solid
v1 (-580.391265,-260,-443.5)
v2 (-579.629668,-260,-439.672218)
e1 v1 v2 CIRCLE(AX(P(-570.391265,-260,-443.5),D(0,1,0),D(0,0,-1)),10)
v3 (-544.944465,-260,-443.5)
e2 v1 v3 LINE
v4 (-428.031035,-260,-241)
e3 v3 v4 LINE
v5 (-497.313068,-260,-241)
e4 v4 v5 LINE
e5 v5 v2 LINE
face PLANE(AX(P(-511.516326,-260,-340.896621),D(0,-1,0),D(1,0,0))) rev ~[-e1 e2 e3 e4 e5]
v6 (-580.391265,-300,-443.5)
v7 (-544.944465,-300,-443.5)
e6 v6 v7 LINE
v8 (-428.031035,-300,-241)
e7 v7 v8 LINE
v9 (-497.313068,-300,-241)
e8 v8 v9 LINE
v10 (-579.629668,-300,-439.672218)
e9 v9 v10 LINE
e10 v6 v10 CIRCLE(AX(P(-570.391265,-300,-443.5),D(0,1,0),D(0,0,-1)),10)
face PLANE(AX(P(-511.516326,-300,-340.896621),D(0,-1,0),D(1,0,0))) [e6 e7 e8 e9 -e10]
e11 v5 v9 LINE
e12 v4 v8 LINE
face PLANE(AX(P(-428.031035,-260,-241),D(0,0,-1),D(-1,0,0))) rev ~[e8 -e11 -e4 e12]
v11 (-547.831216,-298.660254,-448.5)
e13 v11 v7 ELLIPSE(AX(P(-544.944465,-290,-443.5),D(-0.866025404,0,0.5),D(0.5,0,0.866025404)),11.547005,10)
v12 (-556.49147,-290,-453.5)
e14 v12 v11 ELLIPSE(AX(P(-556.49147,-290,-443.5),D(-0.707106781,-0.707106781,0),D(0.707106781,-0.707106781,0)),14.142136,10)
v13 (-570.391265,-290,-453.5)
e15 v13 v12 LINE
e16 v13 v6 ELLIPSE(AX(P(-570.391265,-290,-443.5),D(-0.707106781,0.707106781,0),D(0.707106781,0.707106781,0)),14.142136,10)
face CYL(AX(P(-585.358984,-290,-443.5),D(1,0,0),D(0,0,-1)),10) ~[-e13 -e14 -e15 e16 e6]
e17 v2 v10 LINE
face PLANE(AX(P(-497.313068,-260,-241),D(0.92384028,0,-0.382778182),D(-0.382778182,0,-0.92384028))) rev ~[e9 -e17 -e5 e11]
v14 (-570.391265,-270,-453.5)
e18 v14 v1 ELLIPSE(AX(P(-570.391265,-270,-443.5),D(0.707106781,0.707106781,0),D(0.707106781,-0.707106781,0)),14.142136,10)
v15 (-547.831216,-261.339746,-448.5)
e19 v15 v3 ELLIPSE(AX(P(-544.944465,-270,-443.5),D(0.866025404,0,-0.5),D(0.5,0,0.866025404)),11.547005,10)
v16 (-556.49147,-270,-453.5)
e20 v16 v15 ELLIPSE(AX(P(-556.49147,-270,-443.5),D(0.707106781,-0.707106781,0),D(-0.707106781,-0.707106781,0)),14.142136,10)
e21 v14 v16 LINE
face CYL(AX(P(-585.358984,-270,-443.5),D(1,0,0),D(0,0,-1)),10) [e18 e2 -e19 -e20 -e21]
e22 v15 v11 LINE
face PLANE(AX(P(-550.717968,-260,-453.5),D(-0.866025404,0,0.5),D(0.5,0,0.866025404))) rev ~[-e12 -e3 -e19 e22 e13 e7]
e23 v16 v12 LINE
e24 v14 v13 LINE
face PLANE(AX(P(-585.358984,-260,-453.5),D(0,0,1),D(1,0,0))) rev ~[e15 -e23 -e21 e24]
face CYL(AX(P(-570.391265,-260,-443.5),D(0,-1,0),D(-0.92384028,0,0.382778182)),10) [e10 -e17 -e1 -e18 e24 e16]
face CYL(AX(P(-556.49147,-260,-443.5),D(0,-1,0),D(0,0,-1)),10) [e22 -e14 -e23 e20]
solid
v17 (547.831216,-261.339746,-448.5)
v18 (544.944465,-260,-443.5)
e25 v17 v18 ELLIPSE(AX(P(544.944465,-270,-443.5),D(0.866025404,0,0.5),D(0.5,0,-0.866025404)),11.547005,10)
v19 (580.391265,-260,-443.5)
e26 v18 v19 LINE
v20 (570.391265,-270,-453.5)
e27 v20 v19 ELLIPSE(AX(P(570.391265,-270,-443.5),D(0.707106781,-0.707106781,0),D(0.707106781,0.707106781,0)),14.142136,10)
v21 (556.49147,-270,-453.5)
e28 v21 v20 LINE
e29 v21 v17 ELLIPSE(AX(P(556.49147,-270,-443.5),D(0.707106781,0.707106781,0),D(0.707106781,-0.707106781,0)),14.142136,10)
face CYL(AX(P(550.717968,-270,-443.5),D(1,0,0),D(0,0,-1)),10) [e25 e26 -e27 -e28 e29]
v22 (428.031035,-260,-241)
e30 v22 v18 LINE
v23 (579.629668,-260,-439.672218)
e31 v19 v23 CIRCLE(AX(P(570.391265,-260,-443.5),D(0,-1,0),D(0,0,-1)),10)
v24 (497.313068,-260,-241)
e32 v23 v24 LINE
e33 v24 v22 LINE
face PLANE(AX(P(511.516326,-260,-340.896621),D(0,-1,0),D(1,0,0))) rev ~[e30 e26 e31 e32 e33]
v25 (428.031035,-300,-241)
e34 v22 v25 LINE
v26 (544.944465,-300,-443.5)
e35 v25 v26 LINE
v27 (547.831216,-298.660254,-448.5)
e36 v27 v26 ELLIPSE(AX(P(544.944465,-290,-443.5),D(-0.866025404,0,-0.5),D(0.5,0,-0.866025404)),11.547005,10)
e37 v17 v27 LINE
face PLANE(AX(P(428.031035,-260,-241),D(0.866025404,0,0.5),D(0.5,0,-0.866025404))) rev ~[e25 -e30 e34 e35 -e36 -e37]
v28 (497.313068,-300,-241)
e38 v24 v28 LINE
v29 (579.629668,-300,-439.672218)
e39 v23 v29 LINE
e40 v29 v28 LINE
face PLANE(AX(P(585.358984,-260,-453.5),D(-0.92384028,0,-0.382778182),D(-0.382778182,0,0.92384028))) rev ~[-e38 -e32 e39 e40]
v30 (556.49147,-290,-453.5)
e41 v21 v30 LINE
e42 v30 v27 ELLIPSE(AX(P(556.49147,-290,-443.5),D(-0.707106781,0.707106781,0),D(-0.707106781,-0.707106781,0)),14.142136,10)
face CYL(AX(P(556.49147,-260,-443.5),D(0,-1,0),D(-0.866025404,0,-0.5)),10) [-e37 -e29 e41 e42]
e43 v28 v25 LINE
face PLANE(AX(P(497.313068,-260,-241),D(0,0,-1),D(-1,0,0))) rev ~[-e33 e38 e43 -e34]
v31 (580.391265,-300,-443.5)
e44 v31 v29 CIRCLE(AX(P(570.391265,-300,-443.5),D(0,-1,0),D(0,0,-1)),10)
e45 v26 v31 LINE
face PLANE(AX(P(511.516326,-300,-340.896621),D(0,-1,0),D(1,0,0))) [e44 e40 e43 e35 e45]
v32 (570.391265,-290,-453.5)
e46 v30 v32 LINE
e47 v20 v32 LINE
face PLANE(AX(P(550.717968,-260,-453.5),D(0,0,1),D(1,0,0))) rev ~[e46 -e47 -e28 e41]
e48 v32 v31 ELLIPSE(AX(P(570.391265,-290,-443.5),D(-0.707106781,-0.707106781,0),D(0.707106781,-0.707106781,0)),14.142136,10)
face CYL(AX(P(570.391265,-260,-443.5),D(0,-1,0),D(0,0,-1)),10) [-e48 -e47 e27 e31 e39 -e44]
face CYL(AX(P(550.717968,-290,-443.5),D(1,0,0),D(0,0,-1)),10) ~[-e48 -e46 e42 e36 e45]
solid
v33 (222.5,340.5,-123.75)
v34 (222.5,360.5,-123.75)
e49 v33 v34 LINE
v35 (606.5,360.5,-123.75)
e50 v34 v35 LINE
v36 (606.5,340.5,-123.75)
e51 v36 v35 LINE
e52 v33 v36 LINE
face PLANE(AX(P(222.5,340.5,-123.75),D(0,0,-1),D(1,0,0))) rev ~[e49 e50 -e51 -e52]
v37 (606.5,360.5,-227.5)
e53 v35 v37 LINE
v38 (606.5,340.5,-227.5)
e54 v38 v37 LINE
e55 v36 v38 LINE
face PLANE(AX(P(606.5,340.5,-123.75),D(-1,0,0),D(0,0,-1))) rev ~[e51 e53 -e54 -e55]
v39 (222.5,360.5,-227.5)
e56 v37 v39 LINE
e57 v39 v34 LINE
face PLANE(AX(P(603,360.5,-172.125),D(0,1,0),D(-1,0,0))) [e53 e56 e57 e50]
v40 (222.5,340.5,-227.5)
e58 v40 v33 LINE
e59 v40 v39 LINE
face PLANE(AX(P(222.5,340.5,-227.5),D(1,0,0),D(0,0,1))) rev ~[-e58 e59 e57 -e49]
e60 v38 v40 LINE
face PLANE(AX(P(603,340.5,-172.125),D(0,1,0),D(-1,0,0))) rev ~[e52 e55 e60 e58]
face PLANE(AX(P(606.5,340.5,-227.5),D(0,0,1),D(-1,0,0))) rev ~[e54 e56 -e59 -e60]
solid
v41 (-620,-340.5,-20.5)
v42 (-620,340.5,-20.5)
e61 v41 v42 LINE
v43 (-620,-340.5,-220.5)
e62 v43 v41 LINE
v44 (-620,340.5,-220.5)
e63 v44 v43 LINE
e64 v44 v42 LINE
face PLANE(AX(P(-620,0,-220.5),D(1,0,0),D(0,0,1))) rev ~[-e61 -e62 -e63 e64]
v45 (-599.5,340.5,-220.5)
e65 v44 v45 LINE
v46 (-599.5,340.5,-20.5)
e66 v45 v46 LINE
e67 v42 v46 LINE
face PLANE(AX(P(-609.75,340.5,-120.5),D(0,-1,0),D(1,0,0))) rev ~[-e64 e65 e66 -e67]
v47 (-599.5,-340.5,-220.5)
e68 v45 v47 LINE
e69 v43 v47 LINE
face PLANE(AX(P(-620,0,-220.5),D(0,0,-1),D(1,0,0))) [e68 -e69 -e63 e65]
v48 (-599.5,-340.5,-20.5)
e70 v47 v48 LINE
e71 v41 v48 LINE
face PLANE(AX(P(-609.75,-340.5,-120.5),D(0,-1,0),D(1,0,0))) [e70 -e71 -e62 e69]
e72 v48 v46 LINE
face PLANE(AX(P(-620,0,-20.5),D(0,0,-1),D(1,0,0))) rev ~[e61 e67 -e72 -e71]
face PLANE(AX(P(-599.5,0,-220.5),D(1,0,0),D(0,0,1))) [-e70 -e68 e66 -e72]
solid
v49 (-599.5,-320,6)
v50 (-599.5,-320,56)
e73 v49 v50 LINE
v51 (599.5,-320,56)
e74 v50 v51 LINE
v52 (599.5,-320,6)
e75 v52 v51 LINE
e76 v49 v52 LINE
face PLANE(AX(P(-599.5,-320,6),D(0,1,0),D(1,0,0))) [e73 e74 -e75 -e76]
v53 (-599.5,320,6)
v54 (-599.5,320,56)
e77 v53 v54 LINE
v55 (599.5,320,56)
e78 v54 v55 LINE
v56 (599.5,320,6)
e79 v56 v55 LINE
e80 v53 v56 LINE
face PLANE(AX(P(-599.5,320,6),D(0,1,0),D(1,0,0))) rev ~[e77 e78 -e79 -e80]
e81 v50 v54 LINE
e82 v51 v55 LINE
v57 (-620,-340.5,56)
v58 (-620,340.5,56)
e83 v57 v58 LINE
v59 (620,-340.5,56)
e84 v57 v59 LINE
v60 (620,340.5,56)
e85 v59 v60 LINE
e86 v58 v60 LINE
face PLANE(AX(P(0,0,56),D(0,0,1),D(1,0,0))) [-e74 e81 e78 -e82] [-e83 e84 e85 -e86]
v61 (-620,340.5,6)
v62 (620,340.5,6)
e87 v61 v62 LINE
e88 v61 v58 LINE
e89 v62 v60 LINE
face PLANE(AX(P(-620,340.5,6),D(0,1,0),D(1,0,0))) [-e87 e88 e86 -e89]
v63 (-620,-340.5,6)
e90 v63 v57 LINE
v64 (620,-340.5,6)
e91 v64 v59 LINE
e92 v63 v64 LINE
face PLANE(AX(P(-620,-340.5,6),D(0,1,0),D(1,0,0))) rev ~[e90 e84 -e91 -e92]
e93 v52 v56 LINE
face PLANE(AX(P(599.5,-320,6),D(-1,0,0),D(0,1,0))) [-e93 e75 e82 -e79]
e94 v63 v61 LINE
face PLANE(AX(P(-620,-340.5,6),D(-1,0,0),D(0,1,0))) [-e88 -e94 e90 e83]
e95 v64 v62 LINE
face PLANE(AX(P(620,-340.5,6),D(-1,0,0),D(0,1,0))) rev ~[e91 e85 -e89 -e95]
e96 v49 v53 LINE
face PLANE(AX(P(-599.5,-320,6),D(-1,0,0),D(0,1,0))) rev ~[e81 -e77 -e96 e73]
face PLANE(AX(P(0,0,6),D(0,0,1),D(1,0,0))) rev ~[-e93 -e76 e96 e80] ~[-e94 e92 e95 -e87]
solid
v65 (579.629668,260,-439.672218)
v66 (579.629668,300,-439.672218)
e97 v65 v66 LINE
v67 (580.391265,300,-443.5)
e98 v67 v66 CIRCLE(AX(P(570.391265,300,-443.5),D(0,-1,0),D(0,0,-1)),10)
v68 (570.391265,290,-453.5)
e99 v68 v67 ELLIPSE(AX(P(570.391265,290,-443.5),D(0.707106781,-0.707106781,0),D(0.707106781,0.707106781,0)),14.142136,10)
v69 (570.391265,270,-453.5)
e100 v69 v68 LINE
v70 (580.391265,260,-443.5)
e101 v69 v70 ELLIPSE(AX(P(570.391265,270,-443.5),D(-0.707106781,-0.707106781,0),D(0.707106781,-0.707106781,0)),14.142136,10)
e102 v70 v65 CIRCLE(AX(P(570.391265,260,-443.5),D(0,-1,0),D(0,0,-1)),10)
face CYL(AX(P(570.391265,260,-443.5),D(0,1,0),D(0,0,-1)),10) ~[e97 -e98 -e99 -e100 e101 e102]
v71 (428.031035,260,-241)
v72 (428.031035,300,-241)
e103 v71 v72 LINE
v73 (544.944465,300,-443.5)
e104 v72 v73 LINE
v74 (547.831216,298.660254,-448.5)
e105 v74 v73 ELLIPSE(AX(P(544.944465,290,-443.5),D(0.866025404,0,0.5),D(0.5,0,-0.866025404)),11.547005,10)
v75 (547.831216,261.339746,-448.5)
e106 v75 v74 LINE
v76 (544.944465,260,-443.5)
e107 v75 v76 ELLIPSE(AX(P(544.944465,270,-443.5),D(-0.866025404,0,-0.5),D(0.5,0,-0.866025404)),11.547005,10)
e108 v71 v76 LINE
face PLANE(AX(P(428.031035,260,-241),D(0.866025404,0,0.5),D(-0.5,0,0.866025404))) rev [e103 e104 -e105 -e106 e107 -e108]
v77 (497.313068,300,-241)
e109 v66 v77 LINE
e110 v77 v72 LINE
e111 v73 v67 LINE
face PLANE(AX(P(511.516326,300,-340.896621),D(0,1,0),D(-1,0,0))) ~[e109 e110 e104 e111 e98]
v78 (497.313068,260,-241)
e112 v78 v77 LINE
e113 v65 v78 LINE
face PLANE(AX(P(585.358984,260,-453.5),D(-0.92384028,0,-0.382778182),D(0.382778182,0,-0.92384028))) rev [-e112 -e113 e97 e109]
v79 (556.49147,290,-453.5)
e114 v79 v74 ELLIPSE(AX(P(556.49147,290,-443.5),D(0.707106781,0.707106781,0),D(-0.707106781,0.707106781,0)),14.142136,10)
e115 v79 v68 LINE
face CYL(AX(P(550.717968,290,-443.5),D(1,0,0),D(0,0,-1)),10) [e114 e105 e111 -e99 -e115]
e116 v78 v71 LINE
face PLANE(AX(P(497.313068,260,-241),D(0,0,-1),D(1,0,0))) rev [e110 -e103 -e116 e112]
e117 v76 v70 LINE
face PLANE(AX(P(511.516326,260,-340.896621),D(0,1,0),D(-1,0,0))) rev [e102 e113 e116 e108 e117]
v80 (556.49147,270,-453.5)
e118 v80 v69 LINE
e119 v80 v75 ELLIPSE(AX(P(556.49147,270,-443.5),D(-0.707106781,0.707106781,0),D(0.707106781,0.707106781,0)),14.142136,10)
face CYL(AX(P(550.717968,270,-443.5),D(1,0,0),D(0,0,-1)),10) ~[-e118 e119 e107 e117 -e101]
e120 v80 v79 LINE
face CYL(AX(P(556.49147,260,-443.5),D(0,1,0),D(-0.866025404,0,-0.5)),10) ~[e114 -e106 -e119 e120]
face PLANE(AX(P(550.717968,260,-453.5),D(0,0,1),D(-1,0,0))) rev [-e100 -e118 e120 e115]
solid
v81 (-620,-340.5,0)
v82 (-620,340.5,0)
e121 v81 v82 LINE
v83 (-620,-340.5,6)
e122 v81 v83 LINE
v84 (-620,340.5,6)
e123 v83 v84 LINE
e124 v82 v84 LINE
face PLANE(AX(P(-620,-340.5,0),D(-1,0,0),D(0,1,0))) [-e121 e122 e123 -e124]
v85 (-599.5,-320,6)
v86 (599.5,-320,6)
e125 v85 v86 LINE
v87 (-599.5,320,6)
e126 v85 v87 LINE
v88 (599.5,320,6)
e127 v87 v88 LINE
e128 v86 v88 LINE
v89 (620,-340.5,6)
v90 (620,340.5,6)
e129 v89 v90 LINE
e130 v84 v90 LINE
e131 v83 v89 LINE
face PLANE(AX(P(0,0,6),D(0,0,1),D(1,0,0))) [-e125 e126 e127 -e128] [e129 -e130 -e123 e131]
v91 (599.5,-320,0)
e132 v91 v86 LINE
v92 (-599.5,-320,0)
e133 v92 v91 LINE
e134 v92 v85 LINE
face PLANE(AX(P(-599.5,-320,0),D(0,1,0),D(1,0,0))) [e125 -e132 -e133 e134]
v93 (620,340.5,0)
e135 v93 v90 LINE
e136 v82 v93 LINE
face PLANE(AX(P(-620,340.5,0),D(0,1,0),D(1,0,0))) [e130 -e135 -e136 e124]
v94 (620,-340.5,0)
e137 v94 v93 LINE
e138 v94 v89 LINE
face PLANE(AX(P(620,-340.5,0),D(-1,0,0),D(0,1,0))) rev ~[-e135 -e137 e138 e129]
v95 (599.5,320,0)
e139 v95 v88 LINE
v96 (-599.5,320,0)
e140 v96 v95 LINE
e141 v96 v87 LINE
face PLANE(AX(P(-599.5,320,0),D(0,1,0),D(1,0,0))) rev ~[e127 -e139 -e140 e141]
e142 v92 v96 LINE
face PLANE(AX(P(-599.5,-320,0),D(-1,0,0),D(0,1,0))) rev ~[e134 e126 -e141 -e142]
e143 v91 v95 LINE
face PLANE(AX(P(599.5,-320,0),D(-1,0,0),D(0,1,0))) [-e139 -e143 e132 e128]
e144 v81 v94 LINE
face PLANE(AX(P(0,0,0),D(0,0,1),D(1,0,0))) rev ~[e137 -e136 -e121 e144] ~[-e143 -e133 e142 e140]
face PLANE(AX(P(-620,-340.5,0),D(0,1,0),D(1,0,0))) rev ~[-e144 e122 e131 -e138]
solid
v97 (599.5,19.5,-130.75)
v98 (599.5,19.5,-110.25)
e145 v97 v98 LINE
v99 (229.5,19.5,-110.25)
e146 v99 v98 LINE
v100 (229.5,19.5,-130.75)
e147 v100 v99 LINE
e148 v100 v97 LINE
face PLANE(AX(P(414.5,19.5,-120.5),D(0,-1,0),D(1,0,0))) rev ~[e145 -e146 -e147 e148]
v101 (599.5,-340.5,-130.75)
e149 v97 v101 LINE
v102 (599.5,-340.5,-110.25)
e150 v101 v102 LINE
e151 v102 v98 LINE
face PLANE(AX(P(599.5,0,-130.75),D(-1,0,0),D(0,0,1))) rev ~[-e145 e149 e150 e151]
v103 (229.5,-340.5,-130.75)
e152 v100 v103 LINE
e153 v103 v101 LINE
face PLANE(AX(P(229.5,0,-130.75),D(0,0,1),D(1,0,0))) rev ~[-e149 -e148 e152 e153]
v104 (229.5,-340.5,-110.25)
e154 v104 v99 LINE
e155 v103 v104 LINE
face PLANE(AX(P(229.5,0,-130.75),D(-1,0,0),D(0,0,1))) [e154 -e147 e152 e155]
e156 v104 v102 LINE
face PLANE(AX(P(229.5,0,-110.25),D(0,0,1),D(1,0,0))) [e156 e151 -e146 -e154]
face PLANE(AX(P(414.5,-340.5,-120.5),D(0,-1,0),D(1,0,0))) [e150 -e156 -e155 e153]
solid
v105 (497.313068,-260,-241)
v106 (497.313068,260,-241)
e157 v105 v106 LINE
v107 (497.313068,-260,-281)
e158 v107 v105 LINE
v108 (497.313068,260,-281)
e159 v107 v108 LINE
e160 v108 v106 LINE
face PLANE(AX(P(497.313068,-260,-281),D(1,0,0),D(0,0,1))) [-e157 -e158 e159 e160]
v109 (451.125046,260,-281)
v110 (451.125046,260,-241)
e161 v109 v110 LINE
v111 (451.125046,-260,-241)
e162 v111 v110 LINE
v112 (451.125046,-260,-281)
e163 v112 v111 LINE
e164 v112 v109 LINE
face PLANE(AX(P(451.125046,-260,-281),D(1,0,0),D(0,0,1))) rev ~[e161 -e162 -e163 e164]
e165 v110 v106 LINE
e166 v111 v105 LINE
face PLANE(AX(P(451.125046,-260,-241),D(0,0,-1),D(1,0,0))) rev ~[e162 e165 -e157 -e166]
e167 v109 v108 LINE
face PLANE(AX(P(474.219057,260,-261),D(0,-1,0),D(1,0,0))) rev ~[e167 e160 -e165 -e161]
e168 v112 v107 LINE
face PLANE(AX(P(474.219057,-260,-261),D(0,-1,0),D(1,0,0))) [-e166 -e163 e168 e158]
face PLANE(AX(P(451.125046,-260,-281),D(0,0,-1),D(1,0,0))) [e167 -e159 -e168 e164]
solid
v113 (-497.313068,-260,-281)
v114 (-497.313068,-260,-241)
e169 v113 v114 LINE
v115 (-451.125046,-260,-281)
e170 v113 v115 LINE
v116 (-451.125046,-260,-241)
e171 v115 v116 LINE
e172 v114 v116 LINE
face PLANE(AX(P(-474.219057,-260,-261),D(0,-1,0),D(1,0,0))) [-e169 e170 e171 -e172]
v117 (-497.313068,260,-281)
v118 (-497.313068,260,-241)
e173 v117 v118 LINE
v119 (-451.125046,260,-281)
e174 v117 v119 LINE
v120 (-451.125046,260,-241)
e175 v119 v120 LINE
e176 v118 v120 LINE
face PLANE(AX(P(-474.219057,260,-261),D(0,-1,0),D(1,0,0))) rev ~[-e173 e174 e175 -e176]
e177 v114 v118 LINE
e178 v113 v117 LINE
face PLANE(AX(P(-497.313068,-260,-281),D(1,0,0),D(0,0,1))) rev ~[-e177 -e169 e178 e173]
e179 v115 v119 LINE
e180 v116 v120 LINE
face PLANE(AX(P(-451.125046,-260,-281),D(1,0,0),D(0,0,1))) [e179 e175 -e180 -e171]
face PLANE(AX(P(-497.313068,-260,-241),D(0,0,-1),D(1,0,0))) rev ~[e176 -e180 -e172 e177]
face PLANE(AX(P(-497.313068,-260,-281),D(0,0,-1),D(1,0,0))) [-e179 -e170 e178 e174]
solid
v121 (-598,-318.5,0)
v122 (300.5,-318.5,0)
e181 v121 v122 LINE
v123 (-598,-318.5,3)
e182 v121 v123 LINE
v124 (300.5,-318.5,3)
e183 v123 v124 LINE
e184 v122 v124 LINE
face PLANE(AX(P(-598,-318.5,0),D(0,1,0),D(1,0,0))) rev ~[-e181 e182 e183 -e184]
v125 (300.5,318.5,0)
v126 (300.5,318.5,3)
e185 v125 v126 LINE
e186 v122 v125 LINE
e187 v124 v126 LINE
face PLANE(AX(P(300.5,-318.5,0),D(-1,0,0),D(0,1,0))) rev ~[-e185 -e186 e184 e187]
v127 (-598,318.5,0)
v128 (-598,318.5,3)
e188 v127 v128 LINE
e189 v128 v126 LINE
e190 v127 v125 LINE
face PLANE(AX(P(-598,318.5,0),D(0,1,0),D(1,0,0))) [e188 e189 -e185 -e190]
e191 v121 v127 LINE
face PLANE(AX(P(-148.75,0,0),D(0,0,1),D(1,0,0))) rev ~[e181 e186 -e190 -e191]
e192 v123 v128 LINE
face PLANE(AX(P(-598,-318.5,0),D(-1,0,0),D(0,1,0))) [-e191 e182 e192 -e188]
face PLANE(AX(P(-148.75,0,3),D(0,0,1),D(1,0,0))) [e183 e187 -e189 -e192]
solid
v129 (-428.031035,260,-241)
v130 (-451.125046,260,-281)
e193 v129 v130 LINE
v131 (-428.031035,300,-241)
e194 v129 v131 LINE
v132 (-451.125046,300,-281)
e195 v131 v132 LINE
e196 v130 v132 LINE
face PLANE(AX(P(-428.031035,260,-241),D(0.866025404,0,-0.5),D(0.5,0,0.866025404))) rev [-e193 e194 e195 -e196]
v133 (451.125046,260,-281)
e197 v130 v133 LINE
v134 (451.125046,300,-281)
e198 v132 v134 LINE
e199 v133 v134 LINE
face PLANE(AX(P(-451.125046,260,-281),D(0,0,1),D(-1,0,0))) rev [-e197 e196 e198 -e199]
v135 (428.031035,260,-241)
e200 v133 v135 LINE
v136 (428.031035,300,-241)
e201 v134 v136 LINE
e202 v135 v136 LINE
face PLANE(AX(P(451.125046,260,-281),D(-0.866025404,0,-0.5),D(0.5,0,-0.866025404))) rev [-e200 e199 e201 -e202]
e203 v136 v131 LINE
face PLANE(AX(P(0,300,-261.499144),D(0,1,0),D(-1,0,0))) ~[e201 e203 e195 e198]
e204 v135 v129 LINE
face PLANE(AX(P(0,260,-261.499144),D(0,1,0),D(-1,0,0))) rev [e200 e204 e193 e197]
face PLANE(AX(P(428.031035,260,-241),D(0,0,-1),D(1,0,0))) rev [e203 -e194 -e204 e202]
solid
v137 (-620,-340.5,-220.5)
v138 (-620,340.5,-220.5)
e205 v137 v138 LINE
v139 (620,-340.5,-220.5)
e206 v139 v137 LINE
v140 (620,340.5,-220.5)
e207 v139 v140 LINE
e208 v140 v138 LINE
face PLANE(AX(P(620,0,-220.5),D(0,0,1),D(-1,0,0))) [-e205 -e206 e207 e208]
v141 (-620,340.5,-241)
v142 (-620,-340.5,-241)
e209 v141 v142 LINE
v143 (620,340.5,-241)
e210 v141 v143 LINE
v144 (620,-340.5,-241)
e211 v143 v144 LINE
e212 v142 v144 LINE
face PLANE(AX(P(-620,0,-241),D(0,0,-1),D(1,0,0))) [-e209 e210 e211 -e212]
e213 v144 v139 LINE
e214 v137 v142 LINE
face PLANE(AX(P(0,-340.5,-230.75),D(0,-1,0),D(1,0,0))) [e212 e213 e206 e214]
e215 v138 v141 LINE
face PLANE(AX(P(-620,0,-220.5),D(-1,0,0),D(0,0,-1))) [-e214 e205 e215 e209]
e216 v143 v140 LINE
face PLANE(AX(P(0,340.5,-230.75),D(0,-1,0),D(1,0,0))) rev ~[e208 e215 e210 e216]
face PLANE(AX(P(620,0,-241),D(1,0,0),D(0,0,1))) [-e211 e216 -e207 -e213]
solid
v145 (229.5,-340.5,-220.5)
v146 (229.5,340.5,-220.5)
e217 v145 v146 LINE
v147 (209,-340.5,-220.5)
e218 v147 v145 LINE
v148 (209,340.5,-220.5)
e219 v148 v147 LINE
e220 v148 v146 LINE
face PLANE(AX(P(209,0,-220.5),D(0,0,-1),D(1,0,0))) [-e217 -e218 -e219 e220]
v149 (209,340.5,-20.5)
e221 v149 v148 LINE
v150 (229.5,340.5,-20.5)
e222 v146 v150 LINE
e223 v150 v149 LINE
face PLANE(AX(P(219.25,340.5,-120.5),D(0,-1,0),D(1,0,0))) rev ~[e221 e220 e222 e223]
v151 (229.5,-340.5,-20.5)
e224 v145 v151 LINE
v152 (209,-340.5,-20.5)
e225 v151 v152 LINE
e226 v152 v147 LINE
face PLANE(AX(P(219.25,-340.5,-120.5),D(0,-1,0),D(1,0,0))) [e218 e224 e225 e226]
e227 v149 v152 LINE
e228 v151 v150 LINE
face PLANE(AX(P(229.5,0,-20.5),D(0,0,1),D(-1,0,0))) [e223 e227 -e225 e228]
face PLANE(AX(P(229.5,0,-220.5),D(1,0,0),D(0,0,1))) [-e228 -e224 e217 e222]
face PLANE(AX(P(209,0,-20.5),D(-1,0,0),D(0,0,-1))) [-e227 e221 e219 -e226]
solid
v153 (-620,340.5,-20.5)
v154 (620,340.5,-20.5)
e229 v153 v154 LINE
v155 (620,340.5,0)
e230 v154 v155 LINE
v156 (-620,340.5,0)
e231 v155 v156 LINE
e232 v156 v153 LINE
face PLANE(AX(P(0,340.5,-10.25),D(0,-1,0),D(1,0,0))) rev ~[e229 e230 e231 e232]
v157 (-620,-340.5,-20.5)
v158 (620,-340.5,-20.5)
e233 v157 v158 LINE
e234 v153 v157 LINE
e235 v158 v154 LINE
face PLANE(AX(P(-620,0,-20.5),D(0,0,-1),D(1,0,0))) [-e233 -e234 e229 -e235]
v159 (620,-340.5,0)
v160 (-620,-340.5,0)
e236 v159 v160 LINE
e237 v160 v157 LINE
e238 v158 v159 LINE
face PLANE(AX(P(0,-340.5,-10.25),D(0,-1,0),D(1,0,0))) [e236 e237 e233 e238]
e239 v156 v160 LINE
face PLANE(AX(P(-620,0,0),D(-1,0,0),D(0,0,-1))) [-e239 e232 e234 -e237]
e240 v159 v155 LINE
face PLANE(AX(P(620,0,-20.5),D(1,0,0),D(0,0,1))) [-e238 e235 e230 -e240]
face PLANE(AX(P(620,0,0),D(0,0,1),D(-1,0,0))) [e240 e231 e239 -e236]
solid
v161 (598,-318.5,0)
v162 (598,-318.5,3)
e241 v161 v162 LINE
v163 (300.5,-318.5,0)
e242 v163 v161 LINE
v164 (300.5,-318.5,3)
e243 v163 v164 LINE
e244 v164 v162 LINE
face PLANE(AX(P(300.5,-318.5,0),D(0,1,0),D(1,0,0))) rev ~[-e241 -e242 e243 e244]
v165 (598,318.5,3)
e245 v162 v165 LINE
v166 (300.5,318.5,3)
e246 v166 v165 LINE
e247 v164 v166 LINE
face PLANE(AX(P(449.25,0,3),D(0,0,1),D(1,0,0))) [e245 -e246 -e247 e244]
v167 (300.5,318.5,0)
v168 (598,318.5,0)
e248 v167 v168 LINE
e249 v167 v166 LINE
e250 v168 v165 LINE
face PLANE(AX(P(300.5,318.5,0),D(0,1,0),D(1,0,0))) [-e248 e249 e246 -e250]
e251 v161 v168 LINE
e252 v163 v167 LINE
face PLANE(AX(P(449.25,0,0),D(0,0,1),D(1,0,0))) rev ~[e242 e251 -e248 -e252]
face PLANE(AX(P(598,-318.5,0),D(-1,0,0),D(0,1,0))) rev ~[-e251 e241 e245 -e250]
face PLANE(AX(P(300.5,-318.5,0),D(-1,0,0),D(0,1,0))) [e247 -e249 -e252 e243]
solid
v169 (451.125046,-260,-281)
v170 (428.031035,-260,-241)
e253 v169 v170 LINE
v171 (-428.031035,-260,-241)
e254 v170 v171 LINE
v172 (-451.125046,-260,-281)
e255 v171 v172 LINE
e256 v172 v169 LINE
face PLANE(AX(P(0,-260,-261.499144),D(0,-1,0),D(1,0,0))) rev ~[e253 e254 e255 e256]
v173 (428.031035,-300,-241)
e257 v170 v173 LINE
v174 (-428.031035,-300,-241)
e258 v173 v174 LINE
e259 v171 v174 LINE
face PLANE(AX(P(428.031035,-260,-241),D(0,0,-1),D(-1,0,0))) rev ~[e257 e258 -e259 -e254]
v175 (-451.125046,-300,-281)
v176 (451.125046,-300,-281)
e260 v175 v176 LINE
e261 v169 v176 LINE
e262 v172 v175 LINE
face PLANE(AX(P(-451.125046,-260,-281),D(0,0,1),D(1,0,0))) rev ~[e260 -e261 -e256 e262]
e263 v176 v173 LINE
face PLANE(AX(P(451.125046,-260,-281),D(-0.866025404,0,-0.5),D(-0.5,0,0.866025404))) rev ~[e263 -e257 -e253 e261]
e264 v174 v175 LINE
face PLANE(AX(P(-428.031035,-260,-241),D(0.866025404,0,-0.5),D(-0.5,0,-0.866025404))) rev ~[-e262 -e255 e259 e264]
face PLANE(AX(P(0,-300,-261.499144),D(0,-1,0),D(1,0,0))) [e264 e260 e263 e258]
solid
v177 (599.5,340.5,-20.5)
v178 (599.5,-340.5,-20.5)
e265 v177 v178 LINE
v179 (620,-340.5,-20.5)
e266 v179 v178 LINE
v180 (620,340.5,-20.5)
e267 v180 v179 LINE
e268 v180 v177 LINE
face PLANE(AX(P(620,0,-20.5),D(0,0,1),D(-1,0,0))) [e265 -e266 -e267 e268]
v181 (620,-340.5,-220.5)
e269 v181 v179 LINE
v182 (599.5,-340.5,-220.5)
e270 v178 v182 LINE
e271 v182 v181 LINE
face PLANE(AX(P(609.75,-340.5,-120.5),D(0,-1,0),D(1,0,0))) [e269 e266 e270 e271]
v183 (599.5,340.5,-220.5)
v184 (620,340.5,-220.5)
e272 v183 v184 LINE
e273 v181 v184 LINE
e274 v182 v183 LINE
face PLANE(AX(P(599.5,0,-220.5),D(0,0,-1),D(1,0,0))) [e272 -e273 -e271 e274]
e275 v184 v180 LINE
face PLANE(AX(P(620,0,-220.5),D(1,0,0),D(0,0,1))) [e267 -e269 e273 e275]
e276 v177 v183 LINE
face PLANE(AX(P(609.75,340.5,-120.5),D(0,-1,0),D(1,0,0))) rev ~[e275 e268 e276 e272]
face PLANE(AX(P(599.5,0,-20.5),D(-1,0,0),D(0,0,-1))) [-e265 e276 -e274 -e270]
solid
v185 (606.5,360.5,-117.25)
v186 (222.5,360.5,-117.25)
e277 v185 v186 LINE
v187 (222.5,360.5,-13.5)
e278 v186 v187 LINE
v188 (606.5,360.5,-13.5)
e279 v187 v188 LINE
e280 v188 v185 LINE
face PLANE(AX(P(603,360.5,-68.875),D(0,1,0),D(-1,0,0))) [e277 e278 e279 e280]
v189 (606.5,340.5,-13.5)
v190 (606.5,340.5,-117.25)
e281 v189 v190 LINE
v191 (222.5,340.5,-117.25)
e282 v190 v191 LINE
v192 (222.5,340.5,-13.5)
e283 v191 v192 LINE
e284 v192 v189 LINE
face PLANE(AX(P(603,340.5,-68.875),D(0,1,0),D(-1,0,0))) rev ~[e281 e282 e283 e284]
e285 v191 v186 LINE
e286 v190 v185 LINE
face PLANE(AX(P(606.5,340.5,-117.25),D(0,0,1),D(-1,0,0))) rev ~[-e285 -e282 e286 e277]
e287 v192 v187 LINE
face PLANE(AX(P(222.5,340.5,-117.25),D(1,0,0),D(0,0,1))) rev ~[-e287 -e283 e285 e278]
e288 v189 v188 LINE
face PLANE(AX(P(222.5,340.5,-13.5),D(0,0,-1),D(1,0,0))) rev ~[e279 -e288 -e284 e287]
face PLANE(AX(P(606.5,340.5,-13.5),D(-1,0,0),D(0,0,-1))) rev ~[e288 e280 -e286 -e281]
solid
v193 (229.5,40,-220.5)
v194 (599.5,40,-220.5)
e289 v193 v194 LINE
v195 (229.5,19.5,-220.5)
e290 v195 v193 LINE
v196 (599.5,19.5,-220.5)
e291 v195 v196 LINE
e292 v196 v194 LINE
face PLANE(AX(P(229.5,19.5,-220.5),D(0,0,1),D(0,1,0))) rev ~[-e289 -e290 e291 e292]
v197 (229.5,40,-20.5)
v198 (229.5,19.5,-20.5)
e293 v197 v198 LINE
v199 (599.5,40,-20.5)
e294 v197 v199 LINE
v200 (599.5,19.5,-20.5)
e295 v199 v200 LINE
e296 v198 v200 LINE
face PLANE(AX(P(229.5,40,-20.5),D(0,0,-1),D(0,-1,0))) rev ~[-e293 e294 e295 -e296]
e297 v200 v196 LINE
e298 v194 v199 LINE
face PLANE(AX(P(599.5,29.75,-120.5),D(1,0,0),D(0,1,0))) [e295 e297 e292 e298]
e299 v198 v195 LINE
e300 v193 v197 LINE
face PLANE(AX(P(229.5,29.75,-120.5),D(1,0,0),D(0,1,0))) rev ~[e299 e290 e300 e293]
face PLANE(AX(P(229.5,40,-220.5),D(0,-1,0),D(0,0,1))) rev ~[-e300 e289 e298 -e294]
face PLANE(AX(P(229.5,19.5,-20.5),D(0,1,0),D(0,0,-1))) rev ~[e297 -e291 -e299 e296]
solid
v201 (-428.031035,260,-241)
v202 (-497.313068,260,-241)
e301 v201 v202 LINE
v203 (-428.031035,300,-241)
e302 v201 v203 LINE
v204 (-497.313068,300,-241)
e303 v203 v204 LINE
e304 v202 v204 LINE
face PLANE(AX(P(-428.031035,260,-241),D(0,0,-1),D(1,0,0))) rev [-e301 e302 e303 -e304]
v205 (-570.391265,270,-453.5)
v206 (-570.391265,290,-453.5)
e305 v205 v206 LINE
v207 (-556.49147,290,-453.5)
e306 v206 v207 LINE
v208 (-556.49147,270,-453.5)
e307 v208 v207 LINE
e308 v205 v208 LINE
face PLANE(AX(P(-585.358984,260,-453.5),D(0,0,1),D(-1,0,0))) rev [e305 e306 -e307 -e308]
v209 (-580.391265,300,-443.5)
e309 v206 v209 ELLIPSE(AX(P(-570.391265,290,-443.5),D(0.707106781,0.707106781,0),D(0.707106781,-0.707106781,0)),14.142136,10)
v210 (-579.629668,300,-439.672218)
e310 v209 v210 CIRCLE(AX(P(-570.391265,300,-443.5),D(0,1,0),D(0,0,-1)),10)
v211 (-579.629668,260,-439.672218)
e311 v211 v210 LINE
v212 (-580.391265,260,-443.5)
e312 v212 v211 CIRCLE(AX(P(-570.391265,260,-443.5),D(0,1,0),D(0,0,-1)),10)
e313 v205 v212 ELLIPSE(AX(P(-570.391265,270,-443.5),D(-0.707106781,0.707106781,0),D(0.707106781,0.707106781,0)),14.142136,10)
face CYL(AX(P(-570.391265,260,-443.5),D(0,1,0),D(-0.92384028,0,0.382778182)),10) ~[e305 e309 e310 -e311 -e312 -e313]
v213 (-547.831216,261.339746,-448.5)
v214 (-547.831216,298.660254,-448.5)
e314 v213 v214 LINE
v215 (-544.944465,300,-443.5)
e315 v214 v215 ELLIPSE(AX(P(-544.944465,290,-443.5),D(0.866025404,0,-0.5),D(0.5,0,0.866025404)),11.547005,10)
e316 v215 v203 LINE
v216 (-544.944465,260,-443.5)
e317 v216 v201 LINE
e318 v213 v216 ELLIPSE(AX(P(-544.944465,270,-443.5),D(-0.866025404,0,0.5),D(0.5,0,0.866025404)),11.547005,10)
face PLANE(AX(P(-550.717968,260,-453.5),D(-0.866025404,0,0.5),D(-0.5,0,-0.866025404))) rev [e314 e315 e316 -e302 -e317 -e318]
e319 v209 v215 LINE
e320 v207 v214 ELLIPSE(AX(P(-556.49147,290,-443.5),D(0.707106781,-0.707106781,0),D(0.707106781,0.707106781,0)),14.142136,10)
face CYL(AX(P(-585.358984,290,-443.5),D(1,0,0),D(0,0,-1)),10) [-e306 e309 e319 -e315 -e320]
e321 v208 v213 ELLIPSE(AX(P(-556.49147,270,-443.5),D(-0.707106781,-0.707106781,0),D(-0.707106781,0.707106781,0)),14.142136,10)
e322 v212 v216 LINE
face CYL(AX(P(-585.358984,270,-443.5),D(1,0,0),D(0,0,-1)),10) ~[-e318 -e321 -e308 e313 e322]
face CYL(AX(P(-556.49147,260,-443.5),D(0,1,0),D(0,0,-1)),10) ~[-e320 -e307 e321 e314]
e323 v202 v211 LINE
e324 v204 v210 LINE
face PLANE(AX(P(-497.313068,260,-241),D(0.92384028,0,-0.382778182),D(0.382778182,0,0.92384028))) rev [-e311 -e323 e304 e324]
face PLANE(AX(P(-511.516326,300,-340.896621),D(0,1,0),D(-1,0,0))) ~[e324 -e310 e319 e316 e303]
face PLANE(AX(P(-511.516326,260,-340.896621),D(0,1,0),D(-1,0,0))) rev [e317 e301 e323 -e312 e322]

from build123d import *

# Parameters (mm, degrees)
F1_DEPTH       = 340.5
F1_DEPTH_BACK  = 340.5
F2_DEPTH       = 340.5
F2_DEPTH_BACK  = 340.5
F0_W           = 20.5
F0_H           = 200
F3_DEPTH       = 340.5
F3_DEPTH_BACK  = 340.5
F6_DEPTH       = 40
F7_R           = 10
F7_2_R         = 10
F8_DEPTH       = 40
F10_W          = 46.1880215352
F10_H          = 40
F11_DEPTH      = 520
F12_W          = 7
F12_H          = 96.75
F13_DEPTH      = 20
F14_W          = 1240
F14_H          = 681
F14_W_2        = 1230
F14_H_2        = 671
F14_W_3        = 1199
F14_H_3        = 640
F15_DEPTH      = 6
F16_W          = 898.5
F16_H          = 637
F17_DEPTH      = 3
F16_W_2        = 297.5
F18_DEPTH      = 3
F19_DEPTH      = 50
F22_DEPTH      = 370
F0_W_2         = 370
F0_H_2         = 20.5
F23_DEPTH      = 19.5
F23_DEPTH_BACK = 340.5


# Not quite as in the source:
# - a feature names something its author has since deleted; it is built from what else it names


with BuildPart() as f1:
    # F0 (on Front) → F1 (new body, two sides)
    with BuildSketch(Plane.XZ) as f1_sk:
        Polygon((-599.5, -220.5), (-620, -220.5), (-620, -241), (620, -241), (620, -220.5), (599.5, -220.5), (229.5, -220.5), (209, -220.5), align=None)
    extrude(amount=F1_DEPTH)
    extrude(f1_sk.sketch, amount=-F1_DEPTH_BACK)


with BuildPart() as f2:
    # F0 (on Front) → F2 (new body, two sides)
    with BuildSketch(Plane.XZ) as f2_sk:
        Polygon((229.5, -20.5), (209, -20.5), (209, -220.5), (229.5, -220.5), (229.5, -130.75), (229.5, -110.25), align=None)
    extrude(amount=F2_DEPTH)
    extrude(f2_sk.sketch, amount=-F2_DEPTH_BACK)


with BuildPart() as f2b:
    # F0 (on Front) → F2, piece 2 (new body, two sides)
    with BuildSketch(Plane.XZ) as f2_2_sk:
        with Locations((-609.75, -120.5)):
            Rectangle(F0_W, F0_H)
    extrude(amount=F2_DEPTH)
    extrude(f2_2_sk.sketch, amount=-F2_DEPTH_BACK)


with BuildPart() as f2c:
    # F0 (on Front) → F2, piece 3 (new body, two sides)
    with BuildSketch(Plane.XZ) as f2_3_sk:
        Polygon((620, -220.5), (620, -20.5), (599.5, -20.5), (599.5, -110.25), (599.5, -130.75), (599.5, -220.5), align=None)
    extrude(amount=F2_DEPTH)
    extrude(f2_3_sk.sketch, amount=-F2_DEPTH_BACK)


with BuildPart() as f3:
    # F0 (on Front) → F3 (new body, two sides)
    with BuildSketch(Plane.XZ) as f3_sk:
        Polygon((620, 0), (-620, 0), (-620, -20.5), (-599.5, -20.5), (209, -20.5), (229.5, -20.5), (599.5, -20.5), (620, -20.5), align=None)
    extrude(amount=F3_DEPTH)
    extrude(f3_sk.sketch, amount=-F3_DEPTH_BACK)


with BuildPart() as f6:
    # F5 (on offset) → F6 (new body)
    with BuildSketch(Plane.XZ.offset(260)):
        Polygon((-428.0310354944, -241), (-497.3130677972, -241), (-585.3589838486, -453.5), (-550.7179676972, -453.5), (-451.125046262, -281), align=None)
    extrude(amount=F6_DEPTH)

    # F7
    f7_edges = [f6.edges().sort_by_distance(p)[0] for p in [
        (-568.038476, -300, -453.5),
        (-550.717968, -280, -453.5),
        (-568.038476, -260, -453.5),
        (-585.358984, -280, -453.5),
    ]]
    fillet(f7_edges, radius=F7_R)


with BuildPart() as f6b:
    # F5 (on offset) → F6, piece 2 (new body)
    with BuildSketch(Plane.XZ.offset(260)):
        Polygon((497.3130677972, -241), (428.0310354944, -241), (451.125046262, -281), (550.7179676972, -453.5), (585.3589838486, -453.5), align=None)
    extrude(amount=F6_DEPTH)

    # F7#2
    f7_2_edges = [f6b.edges().sort_by_distance(p)[0] for p in [
        (568.038476, -300, -453.5),
        (550.717968, -280, -453.5),
        (568.038476, -260, -453.5),
        (585.358984, -280, -453.5),
    ]]
    fillet(f7_2_edges, radius=F7_2_R)


with BuildPart() as f8:
    # F5 (on offset) → F8 (new body)
    with BuildSketch(Plane.XZ.offset(260)):
        Polygon((428.0310354944, -241), (-428.0310354944, -241), (-451.125046262, -281), (451.125046262, -281), align=None)
    extrude(amount=F8_DEPTH)


with BuildPart() as f9_1:
    # F9: instance of F6
    add(f6.part.mirror(Plane.XZ))


with BuildPart() as f9_2:
    # F9: instance of F6b
    add(f6b.part.mirror(Plane.XZ))


with BuildPart() as f9_3:
    # F9: instance of F8
    add(f8.part.mirror(Plane.XZ))


with BuildPart() as f11:
    # F10 (on face) → F11 (new body, through all)
    with BuildSketch(Plane.XZ.offset(260)):
        with Locations((474.2190570296, -261)):
            Rectangle(F10_W, F10_H)
    extrude(amount=-F11_DEPTH)


with BuildPart() as f11b:
    # F10 (on face) → F11, piece 2 (new body, through all)
    with BuildSketch(Plane.XZ.offset(260)):
        with Locations((-474.2190570296, -261)):
            Rectangle(F10_W, F10_H)
    extrude(amount=-F11_DEPTH)


with BuildPart() as f13:
    # F12 (on face) → F13 (new body)
    with BuildSketch(Plane(origin=(0, 340.5, 0), x_dir=(-1, 0, 0), z_dir=(0, 1, 0))):
        with Locations((-603, -68.875)):
            Rectangle(F12_W, F12_H)
        Polygon((-222.5, -117.25), (-222.5, -13.5), (-606.5, -13.5), (-606.5, -20.5), (-599.5, -20.5), (-599.5, -117.25), align=None)
    extrude(amount=F13_DEPTH)


with BuildPart() as f13b:
    # F12 (on face) → F13, piece 2 (new body)
    with BuildSketch(Plane(origin=(0, 340.5, 0), x_dir=(-1, 0, 0), z_dir=(0, 1, 0))):
        with Locations((-603, -172.125)):
            Rectangle(F12_W, F12_H)
        Polygon((-222.5, -123.75), (-599.5, -123.75), (-599.5, -220.5), (-606.5, -220.5), (-606.5, -227.5), (-222.5, -227.5), align=None)
    extrude(amount=F13_DEPTH)


with BuildPart() as f15:
    # F14 (on face) → F15 (new body)
    with BuildSketch(Plane.XY):
        Rectangle(F14_W, F14_H)
        Rectangle(F14_W_2, F14_H_2, mode=Mode.SUBTRACT)
        Rectangle(F14_W_2, F14_H_2)
        Rectangle(F14_W_3, F14_H_3, mode=Mode.SUBTRACT)
    extrude(amount=F15_DEPTH)


with BuildPart() as f17:
    # F16 (on face) → F17 (new body)
    with BuildSketch(Plane.XY):
        with Locations((-148.75, 0)):
            Rectangle(F16_W, F16_H)
    extrude(amount=F17_DEPTH)


with BuildPart() as f18:
    # F16 (on face) → F18 (new body, through all)
    with BuildSketch(Plane.XY):
        with Locations((449.25, 0)):
            Rectangle(F16_W_2, F16_H)
    extrude(amount=F18_DEPTH)


with BuildPart() as f19:
    # F19 (new): a face of the model
    f19_faces = [f15.part.faces().sort_by_distance(p)[0] for p in [
        (-613.646946667, 0, 6),
    ]]
    extrude(f19_faces, amount=F19_DEPTH)


with BuildPart() as f22:
    # F21 (on face) → F22 (new body, through all)
    with BuildSketch(Plane.YZ.offset(229.5)):
        Polygon((40, -20.5), (19.5, -20.5), (19.5, -130.75), (19.5, -220.5), (40, -220.5), (40, -130.75), align=None)
    extrude(amount=F22_DEPTH)


with BuildPart() as f23:
    # F0 (on Front) → F23 (new body, two sides)
    with BuildSketch(Plane.XZ) as f23_sk:
        with Locations((414.5, -120.5)):
            Rectangle(F0_W_2, F0_H_2)
    extrude(amount=-F23_DEPTH)
    extrude(f23_sk.sketch, amount=F23_DEPTH_BACK)


solid = Compound([f1.part, f2.part, f2b.part, f2c.part, f3.part, f6.part, f6b.part, f8.part, f9_1.part, f9_2.part, f9_3.part, f11.part, f11b.part, f13.part, f13b.part, f15.part, f17.part, f18.part, f19.part, f22.part, f23.part])
